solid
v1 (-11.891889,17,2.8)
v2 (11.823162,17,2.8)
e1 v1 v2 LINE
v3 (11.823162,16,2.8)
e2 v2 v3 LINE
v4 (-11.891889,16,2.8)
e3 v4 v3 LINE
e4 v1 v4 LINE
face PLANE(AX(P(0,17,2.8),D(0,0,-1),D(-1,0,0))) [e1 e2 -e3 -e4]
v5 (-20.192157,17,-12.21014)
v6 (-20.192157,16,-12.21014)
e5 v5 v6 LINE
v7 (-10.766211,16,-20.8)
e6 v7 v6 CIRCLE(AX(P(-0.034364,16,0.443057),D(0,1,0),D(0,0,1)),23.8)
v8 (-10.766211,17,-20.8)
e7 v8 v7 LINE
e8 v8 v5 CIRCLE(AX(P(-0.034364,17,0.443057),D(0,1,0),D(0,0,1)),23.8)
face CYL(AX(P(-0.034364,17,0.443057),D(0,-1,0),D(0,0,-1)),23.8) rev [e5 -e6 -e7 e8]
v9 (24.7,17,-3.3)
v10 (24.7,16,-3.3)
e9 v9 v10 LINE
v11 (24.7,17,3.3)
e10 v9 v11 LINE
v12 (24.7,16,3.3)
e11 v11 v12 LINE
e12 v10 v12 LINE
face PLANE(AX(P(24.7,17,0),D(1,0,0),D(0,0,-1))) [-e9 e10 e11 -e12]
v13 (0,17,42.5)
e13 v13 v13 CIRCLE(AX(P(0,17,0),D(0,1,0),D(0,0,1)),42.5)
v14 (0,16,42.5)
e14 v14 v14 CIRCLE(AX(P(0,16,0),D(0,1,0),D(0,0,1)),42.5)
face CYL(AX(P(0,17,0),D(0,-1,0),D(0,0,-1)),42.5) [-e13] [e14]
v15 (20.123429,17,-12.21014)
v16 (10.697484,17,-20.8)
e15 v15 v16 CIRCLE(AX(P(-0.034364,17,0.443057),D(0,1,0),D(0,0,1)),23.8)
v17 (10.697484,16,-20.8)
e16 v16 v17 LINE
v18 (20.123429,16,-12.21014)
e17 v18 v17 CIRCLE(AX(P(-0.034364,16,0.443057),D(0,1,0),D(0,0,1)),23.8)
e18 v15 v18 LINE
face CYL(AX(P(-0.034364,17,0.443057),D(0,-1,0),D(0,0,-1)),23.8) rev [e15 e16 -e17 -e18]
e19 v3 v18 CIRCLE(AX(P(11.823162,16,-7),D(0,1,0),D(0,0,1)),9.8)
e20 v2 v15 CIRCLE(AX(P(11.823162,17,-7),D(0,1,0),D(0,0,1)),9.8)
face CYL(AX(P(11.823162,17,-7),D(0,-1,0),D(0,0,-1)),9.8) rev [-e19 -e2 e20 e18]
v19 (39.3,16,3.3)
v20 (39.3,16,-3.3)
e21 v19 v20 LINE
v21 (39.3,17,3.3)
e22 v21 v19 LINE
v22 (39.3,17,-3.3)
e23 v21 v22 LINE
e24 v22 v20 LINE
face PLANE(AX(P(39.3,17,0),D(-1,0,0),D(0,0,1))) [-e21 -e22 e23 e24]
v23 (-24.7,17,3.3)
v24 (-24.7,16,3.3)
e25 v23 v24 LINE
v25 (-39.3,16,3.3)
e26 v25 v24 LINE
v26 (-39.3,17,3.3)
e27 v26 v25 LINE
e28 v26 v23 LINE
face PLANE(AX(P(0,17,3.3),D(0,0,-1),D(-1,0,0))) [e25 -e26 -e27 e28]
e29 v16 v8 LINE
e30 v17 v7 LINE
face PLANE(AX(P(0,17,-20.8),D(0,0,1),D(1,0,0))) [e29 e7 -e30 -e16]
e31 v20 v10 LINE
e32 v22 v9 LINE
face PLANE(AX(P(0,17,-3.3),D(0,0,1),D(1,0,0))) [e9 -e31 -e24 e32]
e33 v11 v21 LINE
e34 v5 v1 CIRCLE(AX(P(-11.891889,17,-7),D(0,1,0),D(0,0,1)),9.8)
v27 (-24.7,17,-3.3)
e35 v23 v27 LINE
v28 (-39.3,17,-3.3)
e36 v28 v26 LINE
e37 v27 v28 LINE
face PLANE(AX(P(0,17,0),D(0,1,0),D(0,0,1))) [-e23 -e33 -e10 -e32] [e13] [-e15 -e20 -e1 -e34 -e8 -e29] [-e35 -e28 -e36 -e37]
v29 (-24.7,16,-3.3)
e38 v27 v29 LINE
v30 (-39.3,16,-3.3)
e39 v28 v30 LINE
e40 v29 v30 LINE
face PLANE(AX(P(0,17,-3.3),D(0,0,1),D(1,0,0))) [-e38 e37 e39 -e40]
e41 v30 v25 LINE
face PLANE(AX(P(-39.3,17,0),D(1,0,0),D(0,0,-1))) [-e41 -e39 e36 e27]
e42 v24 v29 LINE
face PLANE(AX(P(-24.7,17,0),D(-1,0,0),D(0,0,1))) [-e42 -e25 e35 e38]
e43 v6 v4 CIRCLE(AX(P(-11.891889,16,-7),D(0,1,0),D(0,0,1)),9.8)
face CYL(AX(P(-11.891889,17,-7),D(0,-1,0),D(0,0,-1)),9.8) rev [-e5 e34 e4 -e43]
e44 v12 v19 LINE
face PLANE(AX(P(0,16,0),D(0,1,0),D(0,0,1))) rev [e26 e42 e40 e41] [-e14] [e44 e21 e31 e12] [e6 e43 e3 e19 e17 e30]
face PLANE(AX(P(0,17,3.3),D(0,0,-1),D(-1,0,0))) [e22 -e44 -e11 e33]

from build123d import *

# Parameters (mm, degrees)
CUT_EXTRUDE1_DEPTH           = 5
CUT_EXTRUDE3_DEPTH           = 60
SKETCH8_R                    = 43
CUT_EXTRUDE4_DEPTH           = 53
FILLET1_R                    = 7
SKETCH12_W                   = 6.5
SKETCH12_H                   = 51.5
CUT_REVOLVE1_ANGLE           = 60
CUT_REVOLVE1_OTHER_WAY_ANGLE = 60
SKETCH18_W                   = 13
SKETCH18_H                   = 8
CUT_EXTRUDE13_DEPTH          = 5
SKETCH20_W                   = 100
SKETCH20_H                   = 7
CUT_EXTRUDE15_DEPTH          = 5
SKETCH19_R                   = 1.5
CUT_EXTRUDE14_DEPTH          = 12
FILLET3_R                    = 4
SKETCH24_W                   = 2
SKETCH24_H                   = 3
BOSS_EXTRUDE3_DEPTH          = 2
CIRPATTERN2_COUNT            = 5
SKETCH26_W                   = 5
SKETCH26_H                   = 51.5
CUT_REVOLVE2_ANGLE           = 50
CUT_REVOLVE2_OTHER_WAY_ANGLE = 50
SKETCH29_W                   = 16.2
SKETCH29_H                   = 11.2
SKETCH29_W_2                 = 13
SKETCH29_H_2                 = 8
BOSS_EXTRUDE4_DEPTH          = 19
SKETCH36_W                   = 2
SKETCH36_H                   = 2
BOSS_EXTRUDE7_DEPTH          = 5
SKETCH37_W                   = 2
SKETCH37_H                   = 2
BOSS_EXTRUDE8_DEPTH          = 12.5
SKETCH40_W                   = 2
SKETCH40_H                   = 2
BOSS_EXTRUDE9_DEPTH          = 5
FILLET8_R                    = 9
SKETCH50_W                   = 13
SKETCH50_H                   = 5
CUT_EXTRUDE23_DEPTH          = 7
SKETCH51_R                   = 42.5
SKETCH51_W                   = 14.6
SKETCH51_H                   = 6.6
BOSS_EXTRUDE10_DEPTH         = 1
INTERSECT2_START             = 17.5
INTERSECT2_OUTLINE_R         = 45
INTERSECT2_OUTLINE_W         = 13
INTERSECT2_OUTLINE_H         = 8
INTERSECT2_DEPTH             = 59
INTERSECT2_2_OUTLINE_R       = 45
INTERSECT2_2_OUTLINE_W       = 13
INTERSECT2_2_OUTLINE_H       = 5
INTERSECT2_2_DEPTH           = 16
INTERSECT2_START_2           = 16
INTERSECT2_3_OUTLINE_R       = 45
INTERSECT2_3_OUTLINE_R_2     = 43
INTERSECT2_3_DEPTH           = 1.5
INTERSECT3_START             = -40.6
INTERSECT3_OUTLINE_W         = 14.5
INTERSECT3_OUTLINE_H         = 2
INTERSECT3_DEPTH             = 5


# Read off the part's stored shape, not the designer's step: Intersect2, Intersect3
with BuildPart() as part:
    # Sketch1 → Revolve1 (revolve)
    with BuildSketch(Plane.XY, mode=Mode.PRIVATE) as revolve1_sk:
        with BuildLine():
            Line((0, 76.5), (0, 11.5))
            Line((0, 11.5), (22.5, 11.5))
            Line((22.5, 11.5), (22.5, 0))
            Line((22.5, 0), (25, 0))
            Line((25, 0), (25, 11.5))
            Line((25, 11.5), (45, 11.5))
            Line((45, 11.5), (45, 71.5))
            ThreePointArc((45, 71.5), (43.535533906, 75.035533906), (40, 76.5))
            Line((40, 76.5), (0, 76.5))
        make_face()
    revolve(revolve1_sk.sketch.rotate(Axis((0, 2, 0), (0, 1, 0)), 90), axis=Axis((0, 2, 0), (0, 1, 0)))

    # Sketch5 → Cut-Extrude1 (cut)
    with BuildSketch(Plane(origin=(0, 76.5, 0), x_dir=(1, 0, 0), z_dir=(0, 1, 0))):
        with BuildLine():
            Line((-45, 0), (45, 0))
            ThreePointArc((45, 0), (0, 45), (-45, 0))
        make_face()
    extrude(amount=-CUT_EXTRUDE1_DEPTH, mode=Mode.SUBTRACT)

    # Sketch7 → Cut-Extrude3 (cut)
    with BuildSketch(Plane.XZ.offset(-11.5)):
        with BuildLine():
            Line((21, 0), (-21, 0))
            ThreePointArc((-21, 0), (-18.277714988, -10.340461055), (-10.816653826, -18))
            Line((-10.816653826, -18), (10.816653826, -18))
            ThreePointArc((10.816653826, -18), (18.277714988, -10.340461055), (21, 0))
        make_face()
    extrude(amount=-CUT_EXTRUDE3_DEPTH, mode=Mode.SUBTRACT)

    # Sketch8 → Cut-Extrude4 (cut)
    with BuildSketch(Plane(origin=(0, 69, 0), x_dir=(1, 0, 0), z_dir=(0, 1, 0))):
        with Locations(Location((0, 0, 0), (0, 0, 270))):
            Circle(SKETCH8_R)
        with BuildLine():
            Line((22.912878475, -2), (-22.981606036, -2))
            ThreePointArc((-22.981606036, -2), (-20.067855169, 10.855581536), (-10.573881727, 20))
            Line((-10.573881727, 20), (10.505154166, 20))
            ThreePointArc((10.505154166, 20), (19.999127608, 10.855581536), (22.912878475, -2))
        make_face(mode=Mode.SUBTRACT)
    extrude(amount=-CUT_EXTRUDE4_DEPTH, mode=Mode.SUBTRACT)

    # Fillet1
    fillet1_edges = [part.edges().sort_by_distance(p)[0] for p in [
        (-21, 41.5, 0),
        (21, 41.5, 0),
    ]]
    fillet(fillet1_edges, radius=FILLET1_R)

    # Sketch12 → Cut-Revolve1 (revolve, cut)
    with BuildSketch(Plane(origin=(0, 0, 0), x_dir=(0, 0, -1), z_dir=(1, 0, 0))):
        with Locations((-44.75, 43.25)):
            Rectangle(SKETCH12_W, SKETCH12_H)
    revolve(axis=Axis((0, 71.5, 0), (0, -1, 0)), revolution_arc=CUT_REVOLVE1_ANGLE, mode=Mode.SUBTRACT)

    # Sketch12 → Cut-Revolve1 other way (revolve, cut)
    with BuildSketch(Plane(origin=(0, 0, 0), x_dir=(0, 0, -1), z_dir=(1, 0, 0))):
        with Locations((-44.75, 43.25)):
            Rectangle(SKETCH12_W, SKETCH12_H)
    revolve(axis=Axis((0, 71.5, 0), (0, 1, 0)), revolution_arc=CUT_REVOLVE1_OTHER_WAY_ANGLE, mode=Mode.SUBTRACT)

    # Sketch18 → Cut-Extrude13 (cut)
    with BuildSketch(Plane(origin=(0, 71.5, 0), x_dir=(1, 0, 0), z_dir=(0, 1, 0))):
        with Locations((0, 30)):
            Rectangle(SKETCH18_W, SKETCH18_H)
    extrude(amount=-CUT_EXTRUDE13_DEPTH, mode=Mode.SUBTRACT)

    # Sketch20 → Cut-Extrude15 (cut)
    with BuildSketch(Plane(origin=(0, 76.5, 0), x_dir=(1, 0, 0), z_dir=(0, 1, 0))):
        with Locations((0, -3.5)):
            Rectangle(SKETCH20_W, SKETCH20_H)
    extrude(amount=-CUT_EXTRUDE15_DEPTH, mode=Mode.SUBTRACT)

    # Sketch19 → Cut-Extrude14 (cut)
    with BuildSketch(Plane(origin=(0, 0, 7), x_dir=(-1, 0, 0), z_dir=(0, 0, -1))):
        with Locations((0, 74)):
            Circle(SKETCH19_R)
        with Locations((-30, 74)):
            Circle(SKETCH19_R)
        with Locations((29.452221542, 74)):
            Circle(SKETCH19_R)
    extrude(amount=-CUT_EXTRUDE14_DEPTH, mode=Mode.SUBTRACT)

    # Fillet3
    fillet3_edges = [part.edges().sort_by_distance(p)[0] for p in [
        (0, 11.5, 45),
    ]]
    fillet(fillet3_edges, radius=FILLET3_R)

    # Sketch24 → Boss-Extrude3 (add)
    with BuildSketch(Plane.XZ):
        with Locations((0, -22.5)):
            Rectangle(SKETCH24_W, SKETCH24_H)
    boss_extrude3 = extrude(amount=-BOSS_EXTRUDE3_DEPTH)

    # CirPattern2: Boss-Extrude3 ×5 about axis
    cirpattern2_axis = Axis((0, 0, 0), (0, 1, 0))
    for i in range(1, CIRPATTERN2_COUNT):
        add(boss_extrude3.rotate(cirpattern2_axis, i * 360 / CIRPATTERN2_COUNT))

    # Sketch26 → Cut-Revolve2 (revolve, cut)
    with BuildSketch(Plane(origin=(0, 0, 0), x_dir=(0, 0, -1), z_dir=(1, 0, 0))):
        with Locations((45.056943441, 43.25)):
            Rectangle(SKETCH26_W, SKETCH26_H)
    revolve(axis=Axis((0, 2, 0), (0, -1, 0)), revolution_arc=CUT_REVOLVE2_ANGLE, mode=Mode.SUBTRACT)

    # Sketch26 → Cut-Revolve2 other way (revolve, cut)
    with BuildSketch(Plane(origin=(0, 0, 0), x_dir=(0, 0, -1), z_dir=(1, 0, 0))):
        with Locations((45.056943441, 43.25)):
            Rectangle(SKETCH26_W, SKETCH26_H)
    revolve(axis=Axis((0, 2, 0), (0, 1, 0)), revolution_arc=CUT_REVOLVE2_OTHER_WAY_ANGLE, mode=Mode.SUBTRACT)

    # Sketch29 → Boss-Extrude4 (add)
    with BuildSketch(Plane.XZ.offset(-69)):
        with Locations((0, -30)):
            Rectangle(SKETCH29_W, SKETCH29_H)
        with Locations((0, -30)):
            Rectangle(SKETCH29_W_2, SKETCH29_H_2, mode=Mode.SUBTRACT)
    extrude(amount=BOSS_EXTRUDE4_DEPTH)

    # Fillet8
    fillet8_edges = [part.edges().sort_by_distance(p)[0] for p in [
        (-22.981606036, 42.5, 2),
        (22.912878475, 42.5, 2),
    ]]
    fillet(fillet8_edges, radius=FILLET8_R)

    # Sketch50 → Cut-Extrude23 (cut)
    with BuildSketch(Plane(origin=(0, 16, 0), x_dir=(1, 0, 0), z_dir=(0, 1, 0))):
        with Locations((32, 0)):
            Rectangle(SKETCH50_W, SKETCH50_H)
        with Locations((-32, 0)):
            Rectangle(SKETCH50_W, SKETCH50_H)
    extrude(amount=-CUT_EXTRUDE23_DEPTH, mode=Mode.SUBTRACT)

    # Sketch51 → Boss-Extrude10 (add)
    with BuildSketch(Plane(origin=(0, 16, 0), x_dir=(1, 0, 0), z_dir=(0, 1, 0))):
        with Locations(Location((0, 0, 0), (0, 0, 270))):
            Circle(SKETCH51_R)
        with Locations((32, 0)):
            Rectangle(SKETCH51_W, SKETCH51_H, mode=Mode.SUBTRACT)
        with Locations((-32, 0)):
            Rectangle(SKETCH51_W, SKETCH51_H, mode=Mode.SUBTRACT)
        with BuildLine():
            ThreePointArc((-20.192156993, 12.210139591), (-20.468000439, 2.257604402), (-11.8918892, -2.8))
            Line((-11.8918892, -2.8), (11.823161639, -2.8))
            ThreePointArc((11.823161639, -2.8), (20.399272878, 2.257604402), (20.123429432, 12.210139591))
            ThreePointArc((20.123429432, 12.210139591), (15.996509538, 17.148165703), (10.697483593, 20.8))
            Line((10.697483593, 20.8), (-10.766211154, 20.8))
            ThreePointArc((-10.766211154, 20.8), (-16.065237099, 17.148165703), (-20.192156993, 12.210139591))
        make_face(mode=Mode.SUBTRACT)
    extrude(amount=BOSS_EXTRUDE10_DEPTH)

    # Intersect2 outline → Intersect2 (cut)
    with BuildSketch(Plane(origin=(0, 0, 0), x_dir=(1, 0, 0), z_dir=(0, 1, 0)).offset(INTERSECT2_START)):
        Circle(INTERSECT2_OUTLINE_R)
        with Locations((0, 30)):
            Rectangle(INTERSECT2_OUTLINE_W, INTERSECT2_OUTLINE_H, mode=Mode.SUBTRACT)
        with BuildLine():
            ThreePointArc((-18.186533479, 10.5), (-14.978608696, 14.718739128), (-10.816653826, 18))
            Line((-10.816653826, 18), (10.816653826, 18))
            ThreePointArc((10.816653826, 18), (14.978608696, 14.718739128), (18.186533479, 10.5))
            ThreePointArc((18.186533479, 10.5), (18.186533479, 3.5), (12.124355653, 0))
            Line((12.124355653, 0), (-12.124355653, 0))
            ThreePointArc((-12.124355653, 0), (-18.186533479, 3.5), (-18.186533479, 10.5))
        make_face(mode=Mode.SUBTRACT)
    extrude(amount=INTERSECT2_DEPTH, mode=Mode.SUBTRACT)

    # Intersect2 2 outline → Intersect2 2 (cut)
    with BuildSketch(Plane(origin=(0, 0, 0), x_dir=(1, 0, 0), z_dir=(0, 1, 0))):
        Circle(INTERSECT2_2_OUTLINE_R)
        with Locations((-32, 0)):
            Rectangle(INTERSECT2_2_OUTLINE_W, INTERSECT2_2_OUTLINE_H, mode=Mode.SUBTRACT)
        with Locations((32, 0)):
            Rectangle(INTERSECT2_2_OUTLINE_W, INTERSECT2_2_OUTLINE_H, mode=Mode.SUBTRACT)
        with BuildLine():
            ThreePointArc((-18.186533479, 10.5), (-14.978608696, 14.718739128), (-10.816653826, 18))
            Line((-10.816653826, 18), (10.816653826, 18))
            ThreePointArc((10.816653826, 18), (14.978608696, 14.718739128), (18.186533479, 10.5))
            ThreePointArc((18.186533479, 10.5), (18.186533479, 3.5), (12.124355653, 0))
            Line((12.124355653, 0), (-12.124355653, 0))
            ThreePointArc((-12.124355653, 0), (-18.186533479, 3.5), (-18.186533479, 10.5))
        make_face(mode=Mode.SUBTRACT)
    extrude(amount=INTERSECT2_2_DEPTH, mode=Mode.SUBTRACT)

    # Intersect2 3 outline → Intersect2 3 (cut)
    # profile 1 of 2: a face of its own
    with BuildSketch(Plane(origin=(0, 0, 0), x_dir=(1, 0, 0), z_dir=(0, 1, 0)).offset(INTERSECT2_START_2)):
        Circle(INTERSECT2_3_OUTLINE_R)
        Circle(INTERSECT2_3_OUTLINE_R_2, mode=Mode.SUBTRACT)
    # profile 2 of 2: a face of its own
    with BuildSketch(Plane(origin=(0, 0, 0), x_dir=(1, 0, 0), z_dir=(0, 1, 0)).offset(INTERSECT2_START_2)):
        with BuildLine():
            Line((-11.8918892, -2), (11.823161639, -2))
            ThreePointArc((11.823161639, -2), (19.699182165, 2.644738737), (19.445856551, 11.784822073))
            ThreePointArc((19.445856551, 11.784822073), (15.52739893, 16.493045158), (10.505154166, 20))
            Line((10.505154166, 20), (-10.573881727, 20))
            ThreePointArc((-10.573881727, 20), (-15.596126491, 16.493045158), (-19.514584112, 11.784822073))
            ThreePointArc((-19.514584112, 11.784822073), (-19.767909726, 2.644738737), (-11.8918892, -2))
        make_face()
        with BuildLine():
            Line((-10.816653826, 18), (10.816653826, 18))
            ThreePointArc((10.816653826, 18), (14.978608696, 14.718739128), (18.186533479, 10.5))
            ThreePointArc((18.186533479, 10.5), (18.186533479, 3.5), (12.124355653, 0))
            Line((12.124355653, 0), (-12.124355653, 0))
            ThreePointArc((-12.124355653, 0), (-18.186533479, 3.5), (-18.186533479, 10.5))
            ThreePointArc((-18.186533479, 10.5), (-14.978608696, 14.718739128), (-10.816653826, 18))
        make_face(mode=Mode.SUBTRACT)
    extrude(amount=INTERSECT2_3_DEPTH, mode=Mode.SUBTRACT)


with BuildPart() as body_2:
    # Sketch36 → Boss-Extrude7 (new body)
    with BuildSketch(Plane(origin=(0, 0, -35.6), x_dir=(-1, 0, 0), z_dir=(0, 0, -1))):
        with Locations((-6.159647943, 37.918102195)):
            Rectangle(SKETCH36_W, SKETCH36_H)
    extrude(amount=BOSS_EXTRUDE7_DEPTH)

    # Sketch37 → Boss-Extrude8 (add)
    with BuildSketch(Plane.ZY.offset(-5.159647943)):
        with Locations((-39.597351245, 37.918102195)):
            Rectangle(SKETCH37_W, SKETCH37_H)
    extrude(amount=BOSS_EXTRUDE8_DEPTH)

    # Sketch40 → Boss-Extrude9 (add)
    with BuildSketch(Plane(origin=(0, 0, -35.6), x_dir=(-1, 0, 0), z_dir=(0, 0, -1))):
        with Locations((6.340352057, 37.918102195)):
            Rectangle(SKETCH40_W, SKETCH40_H)
    extrude(amount=BOSS_EXTRUDE9_DEPTH)

    # Intersect3 outline → Intersect3 (cut)
    with BuildSketch(Plane.XY.offset(INTERSECT3_START)):
        with Locations((-0.090352057, 37.918102195)):
            Rectangle(INTERSECT3_OUTLINE_W, INTERSECT3_OUTLINE_H)
    extrude(amount=INTERSECT3_DEPTH, mode=Mode.SUBTRACT)


solid = part.part
